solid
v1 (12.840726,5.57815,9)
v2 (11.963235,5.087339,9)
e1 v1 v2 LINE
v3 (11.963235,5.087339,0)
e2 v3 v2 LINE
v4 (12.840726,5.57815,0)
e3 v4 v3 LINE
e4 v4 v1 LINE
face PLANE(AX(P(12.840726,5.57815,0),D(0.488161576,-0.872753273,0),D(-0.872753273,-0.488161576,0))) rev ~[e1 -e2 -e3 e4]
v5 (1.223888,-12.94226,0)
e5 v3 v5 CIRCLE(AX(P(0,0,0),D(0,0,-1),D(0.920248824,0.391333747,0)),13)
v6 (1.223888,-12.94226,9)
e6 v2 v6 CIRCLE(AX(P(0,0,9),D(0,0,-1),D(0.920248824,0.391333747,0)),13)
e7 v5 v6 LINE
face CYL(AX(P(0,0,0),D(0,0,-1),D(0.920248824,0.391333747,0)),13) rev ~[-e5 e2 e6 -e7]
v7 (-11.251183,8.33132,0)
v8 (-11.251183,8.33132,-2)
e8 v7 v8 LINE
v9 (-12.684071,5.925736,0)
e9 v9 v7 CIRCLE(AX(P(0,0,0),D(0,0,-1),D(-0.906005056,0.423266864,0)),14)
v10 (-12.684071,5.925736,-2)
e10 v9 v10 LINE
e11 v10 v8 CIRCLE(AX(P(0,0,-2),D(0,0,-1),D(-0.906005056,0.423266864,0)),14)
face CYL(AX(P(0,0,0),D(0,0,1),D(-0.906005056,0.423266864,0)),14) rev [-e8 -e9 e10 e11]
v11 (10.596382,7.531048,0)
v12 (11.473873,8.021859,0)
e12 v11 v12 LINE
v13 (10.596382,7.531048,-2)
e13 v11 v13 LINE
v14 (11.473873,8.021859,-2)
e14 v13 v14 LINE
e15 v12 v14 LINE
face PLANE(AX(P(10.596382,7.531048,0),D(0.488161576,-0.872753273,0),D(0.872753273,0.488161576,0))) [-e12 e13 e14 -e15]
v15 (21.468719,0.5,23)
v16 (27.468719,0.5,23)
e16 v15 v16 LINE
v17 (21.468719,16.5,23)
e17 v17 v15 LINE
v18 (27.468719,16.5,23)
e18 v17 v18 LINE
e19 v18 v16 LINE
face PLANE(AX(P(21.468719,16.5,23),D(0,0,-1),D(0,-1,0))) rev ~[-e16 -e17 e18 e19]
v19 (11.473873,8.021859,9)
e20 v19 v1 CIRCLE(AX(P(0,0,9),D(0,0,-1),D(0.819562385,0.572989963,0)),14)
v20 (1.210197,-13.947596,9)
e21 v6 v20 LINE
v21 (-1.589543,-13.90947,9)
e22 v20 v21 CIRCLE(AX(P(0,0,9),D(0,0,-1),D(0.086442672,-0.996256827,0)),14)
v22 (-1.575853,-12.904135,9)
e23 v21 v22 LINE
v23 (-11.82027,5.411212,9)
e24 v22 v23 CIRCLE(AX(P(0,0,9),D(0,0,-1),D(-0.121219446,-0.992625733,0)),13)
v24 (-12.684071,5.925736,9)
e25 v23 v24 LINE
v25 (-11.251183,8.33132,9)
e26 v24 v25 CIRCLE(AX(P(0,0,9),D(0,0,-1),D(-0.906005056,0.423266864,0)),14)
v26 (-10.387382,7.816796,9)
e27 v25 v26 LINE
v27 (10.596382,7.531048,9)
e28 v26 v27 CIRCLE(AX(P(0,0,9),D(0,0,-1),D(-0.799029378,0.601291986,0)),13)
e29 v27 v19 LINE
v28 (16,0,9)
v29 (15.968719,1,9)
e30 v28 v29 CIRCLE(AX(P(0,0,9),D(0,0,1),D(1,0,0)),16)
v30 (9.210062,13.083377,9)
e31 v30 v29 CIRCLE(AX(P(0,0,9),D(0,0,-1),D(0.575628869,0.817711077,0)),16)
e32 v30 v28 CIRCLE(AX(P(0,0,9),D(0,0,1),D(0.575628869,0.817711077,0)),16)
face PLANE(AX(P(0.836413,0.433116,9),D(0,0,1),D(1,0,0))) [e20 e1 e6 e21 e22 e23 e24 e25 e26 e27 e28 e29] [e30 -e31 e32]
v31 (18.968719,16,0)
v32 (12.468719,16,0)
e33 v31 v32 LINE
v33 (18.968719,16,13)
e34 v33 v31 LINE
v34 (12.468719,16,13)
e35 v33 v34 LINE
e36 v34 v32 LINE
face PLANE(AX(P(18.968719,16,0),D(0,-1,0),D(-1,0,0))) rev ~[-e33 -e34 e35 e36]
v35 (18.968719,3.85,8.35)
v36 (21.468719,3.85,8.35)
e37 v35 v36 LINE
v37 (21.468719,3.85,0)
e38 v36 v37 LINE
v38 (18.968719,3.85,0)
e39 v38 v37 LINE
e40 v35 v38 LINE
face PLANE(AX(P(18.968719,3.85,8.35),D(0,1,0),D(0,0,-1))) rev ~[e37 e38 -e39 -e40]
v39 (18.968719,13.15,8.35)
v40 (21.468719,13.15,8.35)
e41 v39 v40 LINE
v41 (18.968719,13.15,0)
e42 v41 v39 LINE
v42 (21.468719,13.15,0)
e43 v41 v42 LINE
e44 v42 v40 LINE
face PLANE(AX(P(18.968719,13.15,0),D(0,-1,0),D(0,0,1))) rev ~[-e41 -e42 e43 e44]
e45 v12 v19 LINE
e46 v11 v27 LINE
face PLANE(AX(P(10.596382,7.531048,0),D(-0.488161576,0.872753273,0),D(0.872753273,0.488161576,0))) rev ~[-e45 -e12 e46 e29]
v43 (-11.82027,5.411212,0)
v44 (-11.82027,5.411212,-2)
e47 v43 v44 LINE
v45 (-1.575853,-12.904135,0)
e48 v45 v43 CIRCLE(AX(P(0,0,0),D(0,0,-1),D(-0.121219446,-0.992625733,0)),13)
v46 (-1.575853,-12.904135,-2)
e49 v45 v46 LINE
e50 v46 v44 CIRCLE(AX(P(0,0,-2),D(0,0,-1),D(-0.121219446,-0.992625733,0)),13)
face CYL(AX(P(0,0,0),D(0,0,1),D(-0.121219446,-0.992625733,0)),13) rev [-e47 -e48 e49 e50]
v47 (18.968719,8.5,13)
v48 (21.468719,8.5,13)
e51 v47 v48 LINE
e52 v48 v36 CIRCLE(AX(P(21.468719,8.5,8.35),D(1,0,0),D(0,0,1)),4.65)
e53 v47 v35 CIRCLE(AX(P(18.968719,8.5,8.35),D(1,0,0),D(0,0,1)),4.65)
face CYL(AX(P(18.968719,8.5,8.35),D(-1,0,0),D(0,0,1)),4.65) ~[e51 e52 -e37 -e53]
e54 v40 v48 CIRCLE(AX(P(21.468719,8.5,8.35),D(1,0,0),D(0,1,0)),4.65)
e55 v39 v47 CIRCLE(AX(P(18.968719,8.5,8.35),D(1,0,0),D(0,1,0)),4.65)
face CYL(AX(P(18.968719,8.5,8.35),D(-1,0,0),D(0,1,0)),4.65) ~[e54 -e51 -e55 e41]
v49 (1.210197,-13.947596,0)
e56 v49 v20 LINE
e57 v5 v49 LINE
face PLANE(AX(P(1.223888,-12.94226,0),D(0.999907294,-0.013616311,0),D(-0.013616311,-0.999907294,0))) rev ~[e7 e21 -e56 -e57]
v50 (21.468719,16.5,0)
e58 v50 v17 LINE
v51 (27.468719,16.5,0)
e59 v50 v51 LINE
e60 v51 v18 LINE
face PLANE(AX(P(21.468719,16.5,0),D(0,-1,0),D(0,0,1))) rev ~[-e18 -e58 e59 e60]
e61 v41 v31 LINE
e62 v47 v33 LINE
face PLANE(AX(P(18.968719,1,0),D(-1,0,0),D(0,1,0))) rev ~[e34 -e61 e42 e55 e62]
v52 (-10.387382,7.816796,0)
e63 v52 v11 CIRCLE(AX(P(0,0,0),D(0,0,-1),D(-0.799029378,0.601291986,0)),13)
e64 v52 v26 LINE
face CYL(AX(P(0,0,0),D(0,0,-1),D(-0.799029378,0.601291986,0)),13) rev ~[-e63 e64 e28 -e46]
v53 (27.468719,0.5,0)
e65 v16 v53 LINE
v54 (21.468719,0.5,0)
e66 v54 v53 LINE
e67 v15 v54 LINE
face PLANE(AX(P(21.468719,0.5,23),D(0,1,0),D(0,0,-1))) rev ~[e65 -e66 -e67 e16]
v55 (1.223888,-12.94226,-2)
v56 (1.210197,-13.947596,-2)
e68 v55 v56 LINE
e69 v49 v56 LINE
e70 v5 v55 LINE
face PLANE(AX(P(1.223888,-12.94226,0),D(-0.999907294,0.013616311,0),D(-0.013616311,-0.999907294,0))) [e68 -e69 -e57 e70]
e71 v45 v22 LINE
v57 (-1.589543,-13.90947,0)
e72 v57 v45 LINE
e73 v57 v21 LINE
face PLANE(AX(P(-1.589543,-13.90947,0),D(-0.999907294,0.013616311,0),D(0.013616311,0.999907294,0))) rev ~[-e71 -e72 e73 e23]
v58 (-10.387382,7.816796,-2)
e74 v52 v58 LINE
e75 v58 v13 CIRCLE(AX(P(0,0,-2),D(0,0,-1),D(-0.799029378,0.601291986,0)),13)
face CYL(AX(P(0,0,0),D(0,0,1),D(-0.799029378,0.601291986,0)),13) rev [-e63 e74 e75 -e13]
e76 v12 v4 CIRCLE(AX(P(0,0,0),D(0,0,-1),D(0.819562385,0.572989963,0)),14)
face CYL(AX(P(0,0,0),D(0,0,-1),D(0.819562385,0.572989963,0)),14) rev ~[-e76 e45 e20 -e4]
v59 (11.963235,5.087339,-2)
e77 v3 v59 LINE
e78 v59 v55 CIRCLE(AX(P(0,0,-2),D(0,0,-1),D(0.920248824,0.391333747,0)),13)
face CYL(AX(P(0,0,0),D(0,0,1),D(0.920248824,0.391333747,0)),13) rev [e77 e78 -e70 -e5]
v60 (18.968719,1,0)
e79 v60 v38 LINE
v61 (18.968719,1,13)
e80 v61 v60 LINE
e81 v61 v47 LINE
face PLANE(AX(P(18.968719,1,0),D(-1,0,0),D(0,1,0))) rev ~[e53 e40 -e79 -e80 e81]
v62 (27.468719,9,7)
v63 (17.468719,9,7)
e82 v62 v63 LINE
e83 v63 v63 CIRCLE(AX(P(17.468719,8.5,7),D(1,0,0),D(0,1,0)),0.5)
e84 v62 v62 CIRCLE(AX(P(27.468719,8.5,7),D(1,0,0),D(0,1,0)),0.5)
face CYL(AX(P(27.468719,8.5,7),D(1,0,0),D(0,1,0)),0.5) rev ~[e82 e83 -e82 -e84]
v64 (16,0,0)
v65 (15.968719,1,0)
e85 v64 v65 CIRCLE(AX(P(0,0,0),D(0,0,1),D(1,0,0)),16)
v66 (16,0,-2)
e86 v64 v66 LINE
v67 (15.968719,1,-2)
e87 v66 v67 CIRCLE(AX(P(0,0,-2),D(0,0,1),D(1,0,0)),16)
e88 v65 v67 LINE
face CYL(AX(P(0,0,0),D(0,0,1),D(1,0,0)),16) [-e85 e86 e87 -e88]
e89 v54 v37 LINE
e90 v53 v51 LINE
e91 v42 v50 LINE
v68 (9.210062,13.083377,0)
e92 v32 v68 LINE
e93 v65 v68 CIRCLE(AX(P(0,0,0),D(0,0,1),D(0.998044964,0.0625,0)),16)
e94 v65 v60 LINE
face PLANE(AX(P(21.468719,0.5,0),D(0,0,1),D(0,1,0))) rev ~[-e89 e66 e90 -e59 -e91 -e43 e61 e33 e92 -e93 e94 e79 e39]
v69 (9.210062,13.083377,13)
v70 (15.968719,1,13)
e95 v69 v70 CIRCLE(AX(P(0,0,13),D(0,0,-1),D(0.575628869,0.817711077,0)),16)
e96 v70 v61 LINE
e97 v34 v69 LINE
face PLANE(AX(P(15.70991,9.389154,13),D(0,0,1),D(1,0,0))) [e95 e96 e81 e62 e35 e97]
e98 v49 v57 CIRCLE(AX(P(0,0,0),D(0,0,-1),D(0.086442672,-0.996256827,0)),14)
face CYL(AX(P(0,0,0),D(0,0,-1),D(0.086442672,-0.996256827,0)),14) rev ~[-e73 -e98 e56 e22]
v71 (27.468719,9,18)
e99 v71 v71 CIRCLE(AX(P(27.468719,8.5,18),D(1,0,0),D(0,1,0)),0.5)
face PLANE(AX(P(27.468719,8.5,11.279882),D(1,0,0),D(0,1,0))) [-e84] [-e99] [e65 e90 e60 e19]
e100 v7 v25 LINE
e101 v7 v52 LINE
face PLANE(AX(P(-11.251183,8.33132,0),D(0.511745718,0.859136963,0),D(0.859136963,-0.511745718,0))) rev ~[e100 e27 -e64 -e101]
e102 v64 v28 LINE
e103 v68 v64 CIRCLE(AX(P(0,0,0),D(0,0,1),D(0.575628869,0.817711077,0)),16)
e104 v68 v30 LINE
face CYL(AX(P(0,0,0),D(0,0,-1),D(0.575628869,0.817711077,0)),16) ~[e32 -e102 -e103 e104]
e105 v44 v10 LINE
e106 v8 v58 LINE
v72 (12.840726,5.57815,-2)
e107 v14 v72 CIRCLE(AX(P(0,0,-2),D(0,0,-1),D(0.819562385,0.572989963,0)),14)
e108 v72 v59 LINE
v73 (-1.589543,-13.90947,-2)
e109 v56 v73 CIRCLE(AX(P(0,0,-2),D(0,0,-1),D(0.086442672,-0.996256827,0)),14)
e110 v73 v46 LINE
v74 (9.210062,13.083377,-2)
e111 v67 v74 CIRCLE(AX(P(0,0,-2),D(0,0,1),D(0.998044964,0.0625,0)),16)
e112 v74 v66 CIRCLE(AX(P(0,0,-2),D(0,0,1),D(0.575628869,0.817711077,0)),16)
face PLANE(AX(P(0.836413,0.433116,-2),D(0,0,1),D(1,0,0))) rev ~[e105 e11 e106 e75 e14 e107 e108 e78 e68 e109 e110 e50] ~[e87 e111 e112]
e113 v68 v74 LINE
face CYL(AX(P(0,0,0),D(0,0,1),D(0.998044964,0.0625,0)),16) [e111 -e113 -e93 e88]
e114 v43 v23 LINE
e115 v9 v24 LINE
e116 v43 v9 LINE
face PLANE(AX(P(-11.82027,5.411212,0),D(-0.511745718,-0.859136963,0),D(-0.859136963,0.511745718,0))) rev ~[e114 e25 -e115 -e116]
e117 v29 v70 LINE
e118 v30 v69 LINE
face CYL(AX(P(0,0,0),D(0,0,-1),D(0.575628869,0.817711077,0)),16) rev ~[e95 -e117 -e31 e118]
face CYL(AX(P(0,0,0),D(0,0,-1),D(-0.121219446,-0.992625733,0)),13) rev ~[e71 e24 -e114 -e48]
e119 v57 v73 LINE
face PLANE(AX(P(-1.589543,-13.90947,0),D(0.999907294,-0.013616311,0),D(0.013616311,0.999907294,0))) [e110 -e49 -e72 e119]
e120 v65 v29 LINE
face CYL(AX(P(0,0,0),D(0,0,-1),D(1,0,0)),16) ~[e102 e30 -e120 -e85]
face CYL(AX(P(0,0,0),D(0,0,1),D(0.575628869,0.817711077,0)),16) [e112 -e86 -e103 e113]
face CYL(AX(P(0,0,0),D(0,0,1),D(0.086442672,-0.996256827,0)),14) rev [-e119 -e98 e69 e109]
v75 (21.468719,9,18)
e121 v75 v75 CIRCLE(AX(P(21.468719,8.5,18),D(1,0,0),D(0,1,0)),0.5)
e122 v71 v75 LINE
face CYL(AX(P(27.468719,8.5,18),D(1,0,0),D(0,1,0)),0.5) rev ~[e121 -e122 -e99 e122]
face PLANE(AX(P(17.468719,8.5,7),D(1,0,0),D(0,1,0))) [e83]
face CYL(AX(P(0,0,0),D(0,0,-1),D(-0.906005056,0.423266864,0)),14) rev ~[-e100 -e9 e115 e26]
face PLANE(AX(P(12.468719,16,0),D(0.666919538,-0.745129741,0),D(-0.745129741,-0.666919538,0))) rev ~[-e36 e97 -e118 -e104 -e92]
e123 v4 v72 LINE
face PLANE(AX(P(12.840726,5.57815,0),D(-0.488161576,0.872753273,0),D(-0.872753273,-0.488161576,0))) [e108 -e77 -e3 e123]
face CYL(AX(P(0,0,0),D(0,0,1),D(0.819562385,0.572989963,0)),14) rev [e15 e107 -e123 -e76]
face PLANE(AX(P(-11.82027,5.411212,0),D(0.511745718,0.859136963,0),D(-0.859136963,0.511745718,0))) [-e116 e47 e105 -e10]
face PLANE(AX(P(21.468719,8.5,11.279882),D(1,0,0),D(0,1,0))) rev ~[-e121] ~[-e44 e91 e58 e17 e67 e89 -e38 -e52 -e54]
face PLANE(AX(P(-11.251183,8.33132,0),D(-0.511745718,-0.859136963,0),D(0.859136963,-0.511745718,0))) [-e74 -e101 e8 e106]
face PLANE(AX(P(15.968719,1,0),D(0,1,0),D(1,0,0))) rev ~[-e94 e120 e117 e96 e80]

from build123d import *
from build123d import SkipClean  # not in build123d's __all__

# Parameters (mm, degrees)
F1_DEPTH = 9
F2_DEPTH = 13
F4_DEPTH = 2.5
F6_DEPTH = 6
F7_R     = 0.5
F8_DEPTH = 10
F9_DEPTH = 2


with BuildPart() as f1:
    # F0 (on Top) → F1 (new body)
    with BuildSketch(Plane.XY):
        with BuildLine():
            ThreePointArc((9.210061901, 13.0833772314), (-14.201425816, -7.3701767138), (16, 0))
            ThreePointArc((16, 0), (15.9921779437, 0.5002445588), (15.9687194227, 1))
            ThreePointArc((15.9687194227, 1), (13.964052369, 7.8105852172), (9.210061901, 13.0833772314))
        make_face()
        with BuildLine():
            Line((10.5963823009, 7.5310478775), (11.473873387, 8.0218594789))
            ThreePointArc((11.473873387, 8.0218594789), (12.2185458229, 6.834262065), (12.8407258, 5.5781503143))
            Line((12.8407258, 5.5781503143), (11.9632347139, 5.0873387129))
            ThreePointArc((11.9632347139, 5.0873387129), (11.1687805133, -6.6526943298), (1.2238876286, -12.9422601995))
            Line((1.2238876286, -12.9422601995), (1.2101974008, -13.9475955724))
            ThreePointArc((1.2101974008, -13.9475955724), (-0.190628347, -13.9987021125), (-1.5895430217, -13.909469903))
            Line((-1.5895430217, -13.909469903), (-1.5758527939, -12.9041345301))
            ThreePointArc((-1.5758527939, -12.9041345301), (-11.3457925498, -6.346100489), (-11.8202699295, 5.4112123221))
            Line((-11.8202699295, 5.4112123221), (-12.6840707878, 5.9257360935))
            ThreePointArc((-12.6840707878, 5.9257360935), (-12.0279174759, 7.1644400474), (-11.2511827783, 8.3313195887))
            Line((-11.2511827783, 8.3313195887), (-10.38738192, 7.8167958172))
            ThreePointArc((-10.38738192, 7.8167958172), (0.1770120365, 12.9987948187), (10.5963823009, 7.5310478775))
        make_face(mode=Mode.SUBTRACT)
        with BuildLine():
            ThreePointArc((9.210061901, 13.0833772314), (13.964052369, 7.8105852172), (15.9687194227, 1))
            Line((15.9687194227, 1), (18.9687194227, 1))
            Line((18.9687194227, 1), (18.9687194227, 16))
            Line((18.9687194227, 16), (12.4687194227, 16))
            Line((12.4687194227, 16), (9.210061901, 13.0833772314))
        make_face()
    extrude(amount=F1_DEPTH)

    # F0 (on Top) → F2 (join)
    with BuildSketch(Plane.XY):
        with BuildLine():
            ThreePointArc((9.210061901, 13.0833772314), (13.964052369, 7.8105852172), (15.9687194227, 1))
            Line((15.9687194227, 1), (18.9687194227, 1))
            Line((18.9687194227, 1), (18.9687194227, 16))
            Line((18.9687194227, 16), (12.4687194227, 16))
            Line((12.4687194227, 16), (9.210061901, 13.0833772314))
        make_face()
    extrude(amount=F2_DEPTH)

    # F3 (on face) → F4 (join)
    with BuildSketch(Plane.YZ.offset(18.9687194227)):
        with BuildLine():
            Line((3.85, 8.35), (3.85, 0))
            Line((3.85, 0), (13.15, 0))
            Line((13.15, 0), (13.15, 8.35))
            ThreePointArc((13.15, 8.35), (11.7880465325, 11.6380465325), (8.5, 13))
            ThreePointArc((8.5, 13), (5.2119534675, 11.6380465325), (3.85, 8.35))
        make_face()
    extrude(amount=F4_DEPTH)

    # F5 (on face) → F6 (join)
    with BuildSketch(Plane.YZ.offset(21.4687194227)):
        with BuildLine():
            Line((0.5, 23), (0.5, 0))
            Line((0.5, 0), (3.85, 0))
            Line((3.85, 0), (3.85, 8.35))
            ThreePointArc((3.85, 8.35), (8.5, 13), (13.15, 8.35))
            Line((13.15, 8.35), (13.15, 0))
            Line((13.15, 0), (16.5, 0))
            Line((16.5, 0), (16.5, 23))
            Line((16.5, 23), (0.5, 23))
        make_face()
        with BuildLine():
            Line((3.85, 8.35), (3.85, 0))
            Line((3.85, 0), (13.15, 0))
            Line((13.15, 0), (13.15, 8.35))
            ThreePointArc((13.15, 8.35), (8.5, 13), (3.85, 8.35))
        make_face()
    extrude(amount=F6_DEPTH)

    # F7 (on face) → F8 (cut)
    with BuildSketch(Plane.YZ.offset(27.4687194227)):
        with Locations((8.5, 7)):
            Circle(F7_R)
        with Locations((8.5, 18)):
            Circle(F7_R)
    extrude(amount=-F8_DEPTH, mode=Mode.SUBTRACT)

    # F0 (on Top) → F9 (join)
    with BuildSketch(Plane.XY):
        with BuildLine():
            ThreePointArc((9.210061901, 13.0833772314), (-14.201425816, -7.3701767138), (16, 0))
            ThreePointArc((16, 0), (15.9921779437, 0.5002445588), (15.9687194227, 1))
            ThreePointArc((15.9687194227, 1), (13.964052369, 7.8105852172), (9.210061901, 13.0833772314))
        make_face()
        with BuildLine():
            Line((10.5963823009, 7.5310478775), (11.473873387, 8.0218594789))
            ThreePointArc((11.473873387, 8.0218594789), (12.2185458229, 6.834262065), (12.8407258, 5.5781503143))
            Line((12.8407258, 5.5781503143), (11.9632347139, 5.0873387129))
            ThreePointArc((11.9632347139, 5.0873387129), (11.1687805133, -6.6526943298), (1.2238876286, -12.9422601995))
            Line((1.2238876286, -12.9422601995), (1.2101974008, -13.9475955724))
            ThreePointArc((1.2101974008, -13.9475955724), (-0.190628347, -13.9987021125), (-1.5895430217, -13.909469903))
            Line((-1.5895430217, -13.909469903), (-1.5758527939, -12.9041345301))
            ThreePointArc((-1.5758527939, -12.9041345301), (-11.3457925498, -6.346100489), (-11.8202699295, 5.4112123221))
            Line((-11.8202699295, 5.4112123221), (-12.6840707878, 5.9257360935))
            ThreePointArc((-12.6840707878, 5.9257360935), (-12.0279174759, 7.1644400474), (-11.2511827783, 8.3313195887))
            Line((-11.2511827783, 8.3313195887), (-10.38738192, 7.8167958172))
            ThreePointArc((-10.38738192, 7.8167958172), (0.1770120365, 12.9987948187), (10.5963823009, 7.5310478775))
        make_face(mode=Mode.SUBTRACT)
    with SkipClean():  # cleaning this boolean's faces spoils the solid; the shape is the same uncleaned
        extrude(amount=-F9_DEPTH)


solid = f1.part
